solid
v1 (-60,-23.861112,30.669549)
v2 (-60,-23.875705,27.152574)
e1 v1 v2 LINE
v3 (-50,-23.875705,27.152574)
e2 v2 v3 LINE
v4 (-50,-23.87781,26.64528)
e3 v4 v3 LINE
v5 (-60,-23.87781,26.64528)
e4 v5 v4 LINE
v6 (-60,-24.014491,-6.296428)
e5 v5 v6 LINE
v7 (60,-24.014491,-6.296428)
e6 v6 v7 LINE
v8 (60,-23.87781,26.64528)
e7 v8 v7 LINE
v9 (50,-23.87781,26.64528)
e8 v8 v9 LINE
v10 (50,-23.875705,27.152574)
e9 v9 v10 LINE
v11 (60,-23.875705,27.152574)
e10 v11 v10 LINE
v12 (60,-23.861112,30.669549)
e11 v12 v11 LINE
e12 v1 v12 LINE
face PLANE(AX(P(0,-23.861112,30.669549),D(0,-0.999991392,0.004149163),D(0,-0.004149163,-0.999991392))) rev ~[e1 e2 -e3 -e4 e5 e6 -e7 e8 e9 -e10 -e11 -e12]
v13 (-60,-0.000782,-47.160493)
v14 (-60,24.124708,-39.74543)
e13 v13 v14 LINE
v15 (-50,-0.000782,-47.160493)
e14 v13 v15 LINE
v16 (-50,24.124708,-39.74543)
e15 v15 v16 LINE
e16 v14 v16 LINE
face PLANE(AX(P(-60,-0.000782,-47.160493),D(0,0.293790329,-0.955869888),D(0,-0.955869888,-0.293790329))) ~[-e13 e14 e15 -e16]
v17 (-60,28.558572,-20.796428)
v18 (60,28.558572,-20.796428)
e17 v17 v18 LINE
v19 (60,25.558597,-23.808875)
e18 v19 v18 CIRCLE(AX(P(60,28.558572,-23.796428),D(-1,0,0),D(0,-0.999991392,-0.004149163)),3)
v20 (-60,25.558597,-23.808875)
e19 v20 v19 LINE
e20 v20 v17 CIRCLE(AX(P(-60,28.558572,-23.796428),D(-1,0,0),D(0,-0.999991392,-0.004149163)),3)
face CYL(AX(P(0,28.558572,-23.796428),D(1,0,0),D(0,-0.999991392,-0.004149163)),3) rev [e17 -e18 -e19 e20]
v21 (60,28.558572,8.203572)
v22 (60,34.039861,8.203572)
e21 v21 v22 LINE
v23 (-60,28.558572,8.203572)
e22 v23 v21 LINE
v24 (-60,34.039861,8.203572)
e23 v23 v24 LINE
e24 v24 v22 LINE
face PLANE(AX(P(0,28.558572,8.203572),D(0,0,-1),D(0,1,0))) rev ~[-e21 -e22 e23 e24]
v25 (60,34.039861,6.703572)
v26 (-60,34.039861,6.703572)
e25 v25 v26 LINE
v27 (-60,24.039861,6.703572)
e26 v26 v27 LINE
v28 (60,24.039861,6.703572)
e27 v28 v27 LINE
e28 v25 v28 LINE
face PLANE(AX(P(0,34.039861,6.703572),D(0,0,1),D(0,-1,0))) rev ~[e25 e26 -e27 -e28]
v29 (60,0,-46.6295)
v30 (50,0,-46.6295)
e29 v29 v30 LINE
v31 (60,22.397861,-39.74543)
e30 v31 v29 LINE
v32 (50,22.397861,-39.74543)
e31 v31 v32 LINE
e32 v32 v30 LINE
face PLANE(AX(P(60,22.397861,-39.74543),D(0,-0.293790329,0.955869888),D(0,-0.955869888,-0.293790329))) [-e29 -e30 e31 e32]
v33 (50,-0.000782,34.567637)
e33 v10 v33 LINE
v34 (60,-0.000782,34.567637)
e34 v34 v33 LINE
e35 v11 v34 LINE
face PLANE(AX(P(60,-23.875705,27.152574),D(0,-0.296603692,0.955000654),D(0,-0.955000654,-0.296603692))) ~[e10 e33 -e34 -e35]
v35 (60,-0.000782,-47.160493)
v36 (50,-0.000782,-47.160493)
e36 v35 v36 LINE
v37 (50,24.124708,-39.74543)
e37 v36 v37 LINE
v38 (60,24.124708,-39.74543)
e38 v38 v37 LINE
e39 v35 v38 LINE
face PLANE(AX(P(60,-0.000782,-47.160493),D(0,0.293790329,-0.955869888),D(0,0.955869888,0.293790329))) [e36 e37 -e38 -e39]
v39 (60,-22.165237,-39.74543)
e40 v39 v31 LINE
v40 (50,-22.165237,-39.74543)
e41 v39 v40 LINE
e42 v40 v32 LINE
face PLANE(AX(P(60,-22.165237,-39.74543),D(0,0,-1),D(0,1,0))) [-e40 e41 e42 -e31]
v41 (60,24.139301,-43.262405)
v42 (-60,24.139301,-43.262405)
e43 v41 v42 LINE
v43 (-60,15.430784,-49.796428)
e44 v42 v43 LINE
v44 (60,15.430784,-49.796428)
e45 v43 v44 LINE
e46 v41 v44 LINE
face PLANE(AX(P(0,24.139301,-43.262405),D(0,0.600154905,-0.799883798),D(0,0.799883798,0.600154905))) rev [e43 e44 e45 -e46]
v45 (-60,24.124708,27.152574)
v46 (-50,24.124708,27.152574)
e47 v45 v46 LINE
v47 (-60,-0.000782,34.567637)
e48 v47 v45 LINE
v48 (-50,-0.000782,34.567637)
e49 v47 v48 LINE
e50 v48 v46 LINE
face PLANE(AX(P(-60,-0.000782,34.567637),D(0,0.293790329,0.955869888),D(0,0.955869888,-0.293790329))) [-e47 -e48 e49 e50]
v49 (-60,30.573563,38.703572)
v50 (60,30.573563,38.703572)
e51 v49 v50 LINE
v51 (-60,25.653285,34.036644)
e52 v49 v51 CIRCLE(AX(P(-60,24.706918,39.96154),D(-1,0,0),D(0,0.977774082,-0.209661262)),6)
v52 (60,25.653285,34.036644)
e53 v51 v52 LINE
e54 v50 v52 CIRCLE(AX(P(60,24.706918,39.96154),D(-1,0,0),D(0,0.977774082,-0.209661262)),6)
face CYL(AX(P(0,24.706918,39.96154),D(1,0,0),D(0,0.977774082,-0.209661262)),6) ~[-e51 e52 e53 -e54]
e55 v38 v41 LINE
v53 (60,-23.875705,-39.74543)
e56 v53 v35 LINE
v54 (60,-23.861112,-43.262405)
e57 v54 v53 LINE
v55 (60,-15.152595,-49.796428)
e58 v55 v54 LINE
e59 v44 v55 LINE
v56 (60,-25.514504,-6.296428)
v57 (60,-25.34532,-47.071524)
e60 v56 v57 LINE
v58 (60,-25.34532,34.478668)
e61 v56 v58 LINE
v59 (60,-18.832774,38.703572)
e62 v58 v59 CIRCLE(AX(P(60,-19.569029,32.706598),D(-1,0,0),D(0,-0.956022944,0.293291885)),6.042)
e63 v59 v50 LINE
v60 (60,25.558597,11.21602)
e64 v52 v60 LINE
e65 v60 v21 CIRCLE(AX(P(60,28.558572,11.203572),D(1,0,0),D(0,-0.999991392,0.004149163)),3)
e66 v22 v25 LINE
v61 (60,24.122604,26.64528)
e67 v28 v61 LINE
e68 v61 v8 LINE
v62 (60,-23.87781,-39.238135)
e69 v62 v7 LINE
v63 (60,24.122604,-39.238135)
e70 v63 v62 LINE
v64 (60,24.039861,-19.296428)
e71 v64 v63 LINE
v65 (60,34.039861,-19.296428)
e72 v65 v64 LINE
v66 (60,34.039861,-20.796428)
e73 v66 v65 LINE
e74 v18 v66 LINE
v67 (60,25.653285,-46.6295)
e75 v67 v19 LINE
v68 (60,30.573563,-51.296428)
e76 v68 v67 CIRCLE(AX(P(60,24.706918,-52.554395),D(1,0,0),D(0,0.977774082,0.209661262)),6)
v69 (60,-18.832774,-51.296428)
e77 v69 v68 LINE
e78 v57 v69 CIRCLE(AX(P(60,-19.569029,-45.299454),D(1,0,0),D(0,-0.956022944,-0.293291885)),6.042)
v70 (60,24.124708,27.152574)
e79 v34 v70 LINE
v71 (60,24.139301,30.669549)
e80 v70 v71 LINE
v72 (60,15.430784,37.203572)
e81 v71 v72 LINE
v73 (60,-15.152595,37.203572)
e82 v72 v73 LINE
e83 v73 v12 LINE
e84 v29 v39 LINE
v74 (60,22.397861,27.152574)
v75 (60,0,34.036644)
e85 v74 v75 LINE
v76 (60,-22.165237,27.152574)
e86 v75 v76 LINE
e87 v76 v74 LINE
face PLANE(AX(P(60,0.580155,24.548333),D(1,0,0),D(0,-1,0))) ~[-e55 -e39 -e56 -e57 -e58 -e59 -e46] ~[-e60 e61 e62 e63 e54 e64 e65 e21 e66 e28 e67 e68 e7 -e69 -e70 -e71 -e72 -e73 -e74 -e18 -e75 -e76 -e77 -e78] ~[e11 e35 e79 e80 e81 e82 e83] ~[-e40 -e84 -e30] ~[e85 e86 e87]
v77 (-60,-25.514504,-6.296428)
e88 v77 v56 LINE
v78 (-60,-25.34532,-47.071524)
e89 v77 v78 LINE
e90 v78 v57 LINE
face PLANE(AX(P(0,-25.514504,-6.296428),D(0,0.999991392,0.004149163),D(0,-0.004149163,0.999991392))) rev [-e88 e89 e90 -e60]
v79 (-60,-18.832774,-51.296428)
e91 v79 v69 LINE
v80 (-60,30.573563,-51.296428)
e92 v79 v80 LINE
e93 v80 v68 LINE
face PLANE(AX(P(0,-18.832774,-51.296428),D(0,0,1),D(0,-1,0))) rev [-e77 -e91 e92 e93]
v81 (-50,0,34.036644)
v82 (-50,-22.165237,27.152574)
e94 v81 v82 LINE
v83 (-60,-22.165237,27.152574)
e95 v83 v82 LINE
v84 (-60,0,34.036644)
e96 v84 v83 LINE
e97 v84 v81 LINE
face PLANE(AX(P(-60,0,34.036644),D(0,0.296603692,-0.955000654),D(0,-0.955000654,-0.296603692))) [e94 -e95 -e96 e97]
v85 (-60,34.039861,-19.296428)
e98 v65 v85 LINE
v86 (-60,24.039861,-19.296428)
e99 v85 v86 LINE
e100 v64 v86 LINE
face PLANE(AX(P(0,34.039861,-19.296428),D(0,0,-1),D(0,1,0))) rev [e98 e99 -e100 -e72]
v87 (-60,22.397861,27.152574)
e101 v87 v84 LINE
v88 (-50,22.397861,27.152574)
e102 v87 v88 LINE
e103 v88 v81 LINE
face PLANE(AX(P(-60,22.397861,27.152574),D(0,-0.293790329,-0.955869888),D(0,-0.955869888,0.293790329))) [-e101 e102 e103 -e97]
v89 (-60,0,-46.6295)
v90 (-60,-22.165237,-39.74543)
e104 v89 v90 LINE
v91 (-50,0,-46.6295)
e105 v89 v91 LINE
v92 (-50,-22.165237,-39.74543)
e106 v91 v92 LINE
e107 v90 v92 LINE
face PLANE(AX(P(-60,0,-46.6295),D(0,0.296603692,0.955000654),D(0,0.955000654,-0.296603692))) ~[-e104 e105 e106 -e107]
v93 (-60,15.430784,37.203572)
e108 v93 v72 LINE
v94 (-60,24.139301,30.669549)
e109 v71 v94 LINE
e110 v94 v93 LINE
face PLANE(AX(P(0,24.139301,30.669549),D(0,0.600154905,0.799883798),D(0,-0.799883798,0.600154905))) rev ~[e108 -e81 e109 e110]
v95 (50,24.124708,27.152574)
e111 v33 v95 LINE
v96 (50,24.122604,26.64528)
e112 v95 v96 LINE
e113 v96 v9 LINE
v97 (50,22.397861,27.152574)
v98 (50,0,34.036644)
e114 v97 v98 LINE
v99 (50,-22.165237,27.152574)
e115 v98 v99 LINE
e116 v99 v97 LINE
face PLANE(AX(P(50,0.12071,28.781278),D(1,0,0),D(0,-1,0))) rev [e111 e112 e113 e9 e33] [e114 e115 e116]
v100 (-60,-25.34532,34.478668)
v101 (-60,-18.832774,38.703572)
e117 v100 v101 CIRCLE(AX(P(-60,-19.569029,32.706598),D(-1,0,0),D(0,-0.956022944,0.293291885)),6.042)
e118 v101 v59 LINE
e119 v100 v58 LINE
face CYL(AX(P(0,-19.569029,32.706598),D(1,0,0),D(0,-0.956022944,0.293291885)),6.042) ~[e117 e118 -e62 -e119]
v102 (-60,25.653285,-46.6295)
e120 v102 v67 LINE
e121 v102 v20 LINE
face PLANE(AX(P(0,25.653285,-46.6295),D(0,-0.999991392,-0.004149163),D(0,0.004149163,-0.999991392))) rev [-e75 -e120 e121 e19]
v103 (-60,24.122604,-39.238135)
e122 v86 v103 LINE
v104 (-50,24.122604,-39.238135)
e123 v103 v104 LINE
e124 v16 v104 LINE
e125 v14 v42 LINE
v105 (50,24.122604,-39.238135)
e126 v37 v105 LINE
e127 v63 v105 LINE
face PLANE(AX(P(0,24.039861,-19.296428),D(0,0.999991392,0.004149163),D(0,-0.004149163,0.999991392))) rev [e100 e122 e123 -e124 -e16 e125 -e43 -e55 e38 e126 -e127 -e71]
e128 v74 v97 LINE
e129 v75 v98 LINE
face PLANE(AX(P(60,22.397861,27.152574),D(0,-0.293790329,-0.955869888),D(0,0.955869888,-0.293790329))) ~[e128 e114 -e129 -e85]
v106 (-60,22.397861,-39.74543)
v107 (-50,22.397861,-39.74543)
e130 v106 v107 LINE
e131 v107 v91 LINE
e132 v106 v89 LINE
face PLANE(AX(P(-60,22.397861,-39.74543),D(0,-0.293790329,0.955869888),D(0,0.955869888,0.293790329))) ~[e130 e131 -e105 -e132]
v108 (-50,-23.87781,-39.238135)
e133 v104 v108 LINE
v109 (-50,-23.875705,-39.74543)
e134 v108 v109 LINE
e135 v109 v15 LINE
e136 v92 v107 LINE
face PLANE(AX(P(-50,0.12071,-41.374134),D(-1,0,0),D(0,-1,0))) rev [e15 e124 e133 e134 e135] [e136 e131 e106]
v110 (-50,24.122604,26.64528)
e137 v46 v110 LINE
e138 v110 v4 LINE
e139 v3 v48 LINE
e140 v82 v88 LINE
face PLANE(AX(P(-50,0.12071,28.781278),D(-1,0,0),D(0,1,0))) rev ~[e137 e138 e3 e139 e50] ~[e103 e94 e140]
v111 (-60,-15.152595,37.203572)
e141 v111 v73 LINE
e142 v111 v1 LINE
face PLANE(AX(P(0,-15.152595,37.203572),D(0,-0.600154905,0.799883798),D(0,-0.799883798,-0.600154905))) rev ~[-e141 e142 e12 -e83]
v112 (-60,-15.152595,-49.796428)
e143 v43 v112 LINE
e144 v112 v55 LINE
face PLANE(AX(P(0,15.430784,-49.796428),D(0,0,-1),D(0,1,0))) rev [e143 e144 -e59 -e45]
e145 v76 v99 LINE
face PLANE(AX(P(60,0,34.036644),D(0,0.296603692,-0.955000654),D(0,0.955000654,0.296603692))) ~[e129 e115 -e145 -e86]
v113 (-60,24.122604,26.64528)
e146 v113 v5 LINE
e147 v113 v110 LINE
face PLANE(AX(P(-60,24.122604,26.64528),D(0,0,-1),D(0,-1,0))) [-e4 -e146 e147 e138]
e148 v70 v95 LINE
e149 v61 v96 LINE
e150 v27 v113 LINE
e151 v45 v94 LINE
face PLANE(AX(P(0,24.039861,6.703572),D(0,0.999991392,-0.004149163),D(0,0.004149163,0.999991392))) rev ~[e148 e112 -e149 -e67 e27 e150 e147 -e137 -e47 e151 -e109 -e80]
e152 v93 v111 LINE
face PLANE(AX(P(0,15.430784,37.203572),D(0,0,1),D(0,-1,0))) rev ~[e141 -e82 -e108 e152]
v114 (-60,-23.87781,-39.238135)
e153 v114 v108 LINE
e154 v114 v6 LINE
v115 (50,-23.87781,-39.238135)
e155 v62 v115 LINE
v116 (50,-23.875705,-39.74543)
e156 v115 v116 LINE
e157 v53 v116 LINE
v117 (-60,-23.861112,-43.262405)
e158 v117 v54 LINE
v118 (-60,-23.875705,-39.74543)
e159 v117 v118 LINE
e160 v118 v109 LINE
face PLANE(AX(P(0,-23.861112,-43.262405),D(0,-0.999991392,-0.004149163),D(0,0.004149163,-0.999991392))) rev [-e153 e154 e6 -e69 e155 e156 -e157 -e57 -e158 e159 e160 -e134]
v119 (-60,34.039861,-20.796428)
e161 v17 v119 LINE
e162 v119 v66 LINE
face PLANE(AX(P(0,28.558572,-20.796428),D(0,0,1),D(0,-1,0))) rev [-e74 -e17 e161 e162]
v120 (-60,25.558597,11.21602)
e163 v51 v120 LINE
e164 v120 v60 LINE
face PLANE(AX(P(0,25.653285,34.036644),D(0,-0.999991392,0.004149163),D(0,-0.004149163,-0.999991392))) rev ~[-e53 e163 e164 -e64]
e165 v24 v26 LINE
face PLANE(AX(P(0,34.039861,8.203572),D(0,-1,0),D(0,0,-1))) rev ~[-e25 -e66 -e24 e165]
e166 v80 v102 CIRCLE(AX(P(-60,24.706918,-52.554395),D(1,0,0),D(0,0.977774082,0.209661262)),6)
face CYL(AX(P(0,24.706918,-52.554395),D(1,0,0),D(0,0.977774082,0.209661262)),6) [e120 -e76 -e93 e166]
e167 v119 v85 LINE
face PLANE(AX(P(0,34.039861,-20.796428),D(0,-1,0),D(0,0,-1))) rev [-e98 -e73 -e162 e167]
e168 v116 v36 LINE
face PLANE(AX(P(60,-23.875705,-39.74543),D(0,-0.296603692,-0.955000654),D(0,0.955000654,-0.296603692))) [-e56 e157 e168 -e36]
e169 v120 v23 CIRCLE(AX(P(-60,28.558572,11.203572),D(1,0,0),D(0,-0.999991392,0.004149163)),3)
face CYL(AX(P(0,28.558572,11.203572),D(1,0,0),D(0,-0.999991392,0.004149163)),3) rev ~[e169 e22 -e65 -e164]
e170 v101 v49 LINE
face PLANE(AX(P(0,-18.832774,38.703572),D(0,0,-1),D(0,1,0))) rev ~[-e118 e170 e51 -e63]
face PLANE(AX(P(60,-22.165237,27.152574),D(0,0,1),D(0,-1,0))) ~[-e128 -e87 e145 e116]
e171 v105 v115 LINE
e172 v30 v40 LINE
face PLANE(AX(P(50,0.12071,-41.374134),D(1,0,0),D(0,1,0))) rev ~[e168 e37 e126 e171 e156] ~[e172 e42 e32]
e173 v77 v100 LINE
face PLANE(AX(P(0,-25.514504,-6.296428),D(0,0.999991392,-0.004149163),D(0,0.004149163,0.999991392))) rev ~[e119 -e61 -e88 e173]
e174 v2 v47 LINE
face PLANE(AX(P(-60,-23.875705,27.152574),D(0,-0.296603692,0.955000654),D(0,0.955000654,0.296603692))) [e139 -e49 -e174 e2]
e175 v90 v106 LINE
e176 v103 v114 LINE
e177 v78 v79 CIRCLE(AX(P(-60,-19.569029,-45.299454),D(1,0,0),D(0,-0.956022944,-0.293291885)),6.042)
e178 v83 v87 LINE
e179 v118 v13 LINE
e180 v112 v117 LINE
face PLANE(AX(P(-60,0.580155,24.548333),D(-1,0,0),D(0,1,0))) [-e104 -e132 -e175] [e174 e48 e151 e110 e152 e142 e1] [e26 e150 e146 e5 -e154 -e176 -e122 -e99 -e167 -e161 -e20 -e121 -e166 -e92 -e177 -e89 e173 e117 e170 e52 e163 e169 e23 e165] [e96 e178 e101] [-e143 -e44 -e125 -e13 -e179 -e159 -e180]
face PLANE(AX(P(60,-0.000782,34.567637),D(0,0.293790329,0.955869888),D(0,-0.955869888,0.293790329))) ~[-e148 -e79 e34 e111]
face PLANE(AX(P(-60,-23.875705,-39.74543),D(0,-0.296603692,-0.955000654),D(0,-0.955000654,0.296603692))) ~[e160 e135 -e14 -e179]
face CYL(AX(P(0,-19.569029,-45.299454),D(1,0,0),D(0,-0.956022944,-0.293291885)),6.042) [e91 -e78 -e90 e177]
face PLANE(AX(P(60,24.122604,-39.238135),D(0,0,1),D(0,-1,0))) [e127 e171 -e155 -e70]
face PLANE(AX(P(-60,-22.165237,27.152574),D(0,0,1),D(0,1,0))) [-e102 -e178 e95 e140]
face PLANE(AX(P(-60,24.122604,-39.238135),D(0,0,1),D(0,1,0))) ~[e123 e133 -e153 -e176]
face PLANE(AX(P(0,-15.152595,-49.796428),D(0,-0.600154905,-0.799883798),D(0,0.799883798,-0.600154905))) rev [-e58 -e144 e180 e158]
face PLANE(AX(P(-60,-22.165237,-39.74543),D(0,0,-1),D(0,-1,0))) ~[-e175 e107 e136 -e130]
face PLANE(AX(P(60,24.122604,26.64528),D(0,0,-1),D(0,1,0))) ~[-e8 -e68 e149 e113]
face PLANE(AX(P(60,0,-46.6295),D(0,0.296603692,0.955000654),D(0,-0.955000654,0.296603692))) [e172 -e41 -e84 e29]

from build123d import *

# Parameters (mm, degrees)
F1_DEPTH = 60
F3_DEPTH = 10


# Not quite as in the source:
# - a feature names something its author has since deleted; it is built from what else it names


with BuildPart() as f1:
    # F0 (on Right) → F1 (new body)
    with BuildSketch(Plane.YZ):
        with BuildLine():
            Line((24.139301102, -43.2624049591), (15.4307844338, -49.7964277864))
            Line((15.4307844338, -49.7964277864), (-15.1525954085, -49.7964277864))
            Line((-15.1525954085, -49.7964277864), (-23.8611120767, -43.2624049591))
            Line((-23.8611120767, -43.2624049591), (-24.0144912707, -6.2964277864))
            Line((-24.0144912707, -6.2964277864), (-25.5145041825, -6.2964277864))
            Line((-25.5145041825, -6.2964277864), (-25.3453201973, -47.0715236276))
            ThreePointArc((-25.3453201973, -47.0715236276), (-22.8573335388, -50.3682627369), (-18.8327744315, -51.2964277864))
            Line((-18.8327744315, -51.2964277864), (30.5735625925, -51.2964277864))
            ThreePointArc((30.5735625925, -51.2964277864), (28.8360021374, -48.2011592055), (25.6532847593, -46.6294995689))
            Line((25.6532847593, -46.6294995689), (25.5585974487, -23.8088752761))
            ThreePointArc((25.5585974487, -23.8088752761), (26.432854985, -21.6795128694), (28.5585716253, -20.7964277864))
            Line((28.5585716253, -20.7964277864), (34.0398614944, -20.7964277864))
            Line((34.0398614944, -20.7964277864), (34.0398614944, -19.2964277864))
            Line((34.0398614944, -19.2964277864), (24.0398614944, -19.2964277864))
            Line((24.0398614944, -19.2964277864), (24.139301102, -43.2624049591))
        make_face()
    extrude(amount=F1_DEPTH)

    # F2 (on face) → F3 (join)
    with BuildSketch(Plane.YZ.offset(60)):
        Polygon((24.1226036063, -39.2381352516), (-23.8778095724, -39.2381352516), (-23.8757047067, -39.7454297089), (-0.0007817785, -47.1604929972), (24.1247084719, -39.7454297089), align=None)
        Polygon((0, -46.6294995689), (-22.1652372944, -39.7454297089), (22.3978614654, -39.7454297089), align=None, mode=Mode.SUBTRACT)
    extrude(amount=-F3_DEPTH)

    # F4: F1 across plane


with BuildPart() as f1_1:
    add(f1.part)
    add(f1.part.mirror(Plane.YZ))

    # F5: F1 across face


with BuildPart() as f1_2:
    add(f1_1.part)
    add(f1_1.part.mirror(Plane(origin=(0, -24.7644977266, -6.2964277864), x_dir=(1, 0, 0), z_dir=(0, 0, 1))))


solid = f1_2.part
